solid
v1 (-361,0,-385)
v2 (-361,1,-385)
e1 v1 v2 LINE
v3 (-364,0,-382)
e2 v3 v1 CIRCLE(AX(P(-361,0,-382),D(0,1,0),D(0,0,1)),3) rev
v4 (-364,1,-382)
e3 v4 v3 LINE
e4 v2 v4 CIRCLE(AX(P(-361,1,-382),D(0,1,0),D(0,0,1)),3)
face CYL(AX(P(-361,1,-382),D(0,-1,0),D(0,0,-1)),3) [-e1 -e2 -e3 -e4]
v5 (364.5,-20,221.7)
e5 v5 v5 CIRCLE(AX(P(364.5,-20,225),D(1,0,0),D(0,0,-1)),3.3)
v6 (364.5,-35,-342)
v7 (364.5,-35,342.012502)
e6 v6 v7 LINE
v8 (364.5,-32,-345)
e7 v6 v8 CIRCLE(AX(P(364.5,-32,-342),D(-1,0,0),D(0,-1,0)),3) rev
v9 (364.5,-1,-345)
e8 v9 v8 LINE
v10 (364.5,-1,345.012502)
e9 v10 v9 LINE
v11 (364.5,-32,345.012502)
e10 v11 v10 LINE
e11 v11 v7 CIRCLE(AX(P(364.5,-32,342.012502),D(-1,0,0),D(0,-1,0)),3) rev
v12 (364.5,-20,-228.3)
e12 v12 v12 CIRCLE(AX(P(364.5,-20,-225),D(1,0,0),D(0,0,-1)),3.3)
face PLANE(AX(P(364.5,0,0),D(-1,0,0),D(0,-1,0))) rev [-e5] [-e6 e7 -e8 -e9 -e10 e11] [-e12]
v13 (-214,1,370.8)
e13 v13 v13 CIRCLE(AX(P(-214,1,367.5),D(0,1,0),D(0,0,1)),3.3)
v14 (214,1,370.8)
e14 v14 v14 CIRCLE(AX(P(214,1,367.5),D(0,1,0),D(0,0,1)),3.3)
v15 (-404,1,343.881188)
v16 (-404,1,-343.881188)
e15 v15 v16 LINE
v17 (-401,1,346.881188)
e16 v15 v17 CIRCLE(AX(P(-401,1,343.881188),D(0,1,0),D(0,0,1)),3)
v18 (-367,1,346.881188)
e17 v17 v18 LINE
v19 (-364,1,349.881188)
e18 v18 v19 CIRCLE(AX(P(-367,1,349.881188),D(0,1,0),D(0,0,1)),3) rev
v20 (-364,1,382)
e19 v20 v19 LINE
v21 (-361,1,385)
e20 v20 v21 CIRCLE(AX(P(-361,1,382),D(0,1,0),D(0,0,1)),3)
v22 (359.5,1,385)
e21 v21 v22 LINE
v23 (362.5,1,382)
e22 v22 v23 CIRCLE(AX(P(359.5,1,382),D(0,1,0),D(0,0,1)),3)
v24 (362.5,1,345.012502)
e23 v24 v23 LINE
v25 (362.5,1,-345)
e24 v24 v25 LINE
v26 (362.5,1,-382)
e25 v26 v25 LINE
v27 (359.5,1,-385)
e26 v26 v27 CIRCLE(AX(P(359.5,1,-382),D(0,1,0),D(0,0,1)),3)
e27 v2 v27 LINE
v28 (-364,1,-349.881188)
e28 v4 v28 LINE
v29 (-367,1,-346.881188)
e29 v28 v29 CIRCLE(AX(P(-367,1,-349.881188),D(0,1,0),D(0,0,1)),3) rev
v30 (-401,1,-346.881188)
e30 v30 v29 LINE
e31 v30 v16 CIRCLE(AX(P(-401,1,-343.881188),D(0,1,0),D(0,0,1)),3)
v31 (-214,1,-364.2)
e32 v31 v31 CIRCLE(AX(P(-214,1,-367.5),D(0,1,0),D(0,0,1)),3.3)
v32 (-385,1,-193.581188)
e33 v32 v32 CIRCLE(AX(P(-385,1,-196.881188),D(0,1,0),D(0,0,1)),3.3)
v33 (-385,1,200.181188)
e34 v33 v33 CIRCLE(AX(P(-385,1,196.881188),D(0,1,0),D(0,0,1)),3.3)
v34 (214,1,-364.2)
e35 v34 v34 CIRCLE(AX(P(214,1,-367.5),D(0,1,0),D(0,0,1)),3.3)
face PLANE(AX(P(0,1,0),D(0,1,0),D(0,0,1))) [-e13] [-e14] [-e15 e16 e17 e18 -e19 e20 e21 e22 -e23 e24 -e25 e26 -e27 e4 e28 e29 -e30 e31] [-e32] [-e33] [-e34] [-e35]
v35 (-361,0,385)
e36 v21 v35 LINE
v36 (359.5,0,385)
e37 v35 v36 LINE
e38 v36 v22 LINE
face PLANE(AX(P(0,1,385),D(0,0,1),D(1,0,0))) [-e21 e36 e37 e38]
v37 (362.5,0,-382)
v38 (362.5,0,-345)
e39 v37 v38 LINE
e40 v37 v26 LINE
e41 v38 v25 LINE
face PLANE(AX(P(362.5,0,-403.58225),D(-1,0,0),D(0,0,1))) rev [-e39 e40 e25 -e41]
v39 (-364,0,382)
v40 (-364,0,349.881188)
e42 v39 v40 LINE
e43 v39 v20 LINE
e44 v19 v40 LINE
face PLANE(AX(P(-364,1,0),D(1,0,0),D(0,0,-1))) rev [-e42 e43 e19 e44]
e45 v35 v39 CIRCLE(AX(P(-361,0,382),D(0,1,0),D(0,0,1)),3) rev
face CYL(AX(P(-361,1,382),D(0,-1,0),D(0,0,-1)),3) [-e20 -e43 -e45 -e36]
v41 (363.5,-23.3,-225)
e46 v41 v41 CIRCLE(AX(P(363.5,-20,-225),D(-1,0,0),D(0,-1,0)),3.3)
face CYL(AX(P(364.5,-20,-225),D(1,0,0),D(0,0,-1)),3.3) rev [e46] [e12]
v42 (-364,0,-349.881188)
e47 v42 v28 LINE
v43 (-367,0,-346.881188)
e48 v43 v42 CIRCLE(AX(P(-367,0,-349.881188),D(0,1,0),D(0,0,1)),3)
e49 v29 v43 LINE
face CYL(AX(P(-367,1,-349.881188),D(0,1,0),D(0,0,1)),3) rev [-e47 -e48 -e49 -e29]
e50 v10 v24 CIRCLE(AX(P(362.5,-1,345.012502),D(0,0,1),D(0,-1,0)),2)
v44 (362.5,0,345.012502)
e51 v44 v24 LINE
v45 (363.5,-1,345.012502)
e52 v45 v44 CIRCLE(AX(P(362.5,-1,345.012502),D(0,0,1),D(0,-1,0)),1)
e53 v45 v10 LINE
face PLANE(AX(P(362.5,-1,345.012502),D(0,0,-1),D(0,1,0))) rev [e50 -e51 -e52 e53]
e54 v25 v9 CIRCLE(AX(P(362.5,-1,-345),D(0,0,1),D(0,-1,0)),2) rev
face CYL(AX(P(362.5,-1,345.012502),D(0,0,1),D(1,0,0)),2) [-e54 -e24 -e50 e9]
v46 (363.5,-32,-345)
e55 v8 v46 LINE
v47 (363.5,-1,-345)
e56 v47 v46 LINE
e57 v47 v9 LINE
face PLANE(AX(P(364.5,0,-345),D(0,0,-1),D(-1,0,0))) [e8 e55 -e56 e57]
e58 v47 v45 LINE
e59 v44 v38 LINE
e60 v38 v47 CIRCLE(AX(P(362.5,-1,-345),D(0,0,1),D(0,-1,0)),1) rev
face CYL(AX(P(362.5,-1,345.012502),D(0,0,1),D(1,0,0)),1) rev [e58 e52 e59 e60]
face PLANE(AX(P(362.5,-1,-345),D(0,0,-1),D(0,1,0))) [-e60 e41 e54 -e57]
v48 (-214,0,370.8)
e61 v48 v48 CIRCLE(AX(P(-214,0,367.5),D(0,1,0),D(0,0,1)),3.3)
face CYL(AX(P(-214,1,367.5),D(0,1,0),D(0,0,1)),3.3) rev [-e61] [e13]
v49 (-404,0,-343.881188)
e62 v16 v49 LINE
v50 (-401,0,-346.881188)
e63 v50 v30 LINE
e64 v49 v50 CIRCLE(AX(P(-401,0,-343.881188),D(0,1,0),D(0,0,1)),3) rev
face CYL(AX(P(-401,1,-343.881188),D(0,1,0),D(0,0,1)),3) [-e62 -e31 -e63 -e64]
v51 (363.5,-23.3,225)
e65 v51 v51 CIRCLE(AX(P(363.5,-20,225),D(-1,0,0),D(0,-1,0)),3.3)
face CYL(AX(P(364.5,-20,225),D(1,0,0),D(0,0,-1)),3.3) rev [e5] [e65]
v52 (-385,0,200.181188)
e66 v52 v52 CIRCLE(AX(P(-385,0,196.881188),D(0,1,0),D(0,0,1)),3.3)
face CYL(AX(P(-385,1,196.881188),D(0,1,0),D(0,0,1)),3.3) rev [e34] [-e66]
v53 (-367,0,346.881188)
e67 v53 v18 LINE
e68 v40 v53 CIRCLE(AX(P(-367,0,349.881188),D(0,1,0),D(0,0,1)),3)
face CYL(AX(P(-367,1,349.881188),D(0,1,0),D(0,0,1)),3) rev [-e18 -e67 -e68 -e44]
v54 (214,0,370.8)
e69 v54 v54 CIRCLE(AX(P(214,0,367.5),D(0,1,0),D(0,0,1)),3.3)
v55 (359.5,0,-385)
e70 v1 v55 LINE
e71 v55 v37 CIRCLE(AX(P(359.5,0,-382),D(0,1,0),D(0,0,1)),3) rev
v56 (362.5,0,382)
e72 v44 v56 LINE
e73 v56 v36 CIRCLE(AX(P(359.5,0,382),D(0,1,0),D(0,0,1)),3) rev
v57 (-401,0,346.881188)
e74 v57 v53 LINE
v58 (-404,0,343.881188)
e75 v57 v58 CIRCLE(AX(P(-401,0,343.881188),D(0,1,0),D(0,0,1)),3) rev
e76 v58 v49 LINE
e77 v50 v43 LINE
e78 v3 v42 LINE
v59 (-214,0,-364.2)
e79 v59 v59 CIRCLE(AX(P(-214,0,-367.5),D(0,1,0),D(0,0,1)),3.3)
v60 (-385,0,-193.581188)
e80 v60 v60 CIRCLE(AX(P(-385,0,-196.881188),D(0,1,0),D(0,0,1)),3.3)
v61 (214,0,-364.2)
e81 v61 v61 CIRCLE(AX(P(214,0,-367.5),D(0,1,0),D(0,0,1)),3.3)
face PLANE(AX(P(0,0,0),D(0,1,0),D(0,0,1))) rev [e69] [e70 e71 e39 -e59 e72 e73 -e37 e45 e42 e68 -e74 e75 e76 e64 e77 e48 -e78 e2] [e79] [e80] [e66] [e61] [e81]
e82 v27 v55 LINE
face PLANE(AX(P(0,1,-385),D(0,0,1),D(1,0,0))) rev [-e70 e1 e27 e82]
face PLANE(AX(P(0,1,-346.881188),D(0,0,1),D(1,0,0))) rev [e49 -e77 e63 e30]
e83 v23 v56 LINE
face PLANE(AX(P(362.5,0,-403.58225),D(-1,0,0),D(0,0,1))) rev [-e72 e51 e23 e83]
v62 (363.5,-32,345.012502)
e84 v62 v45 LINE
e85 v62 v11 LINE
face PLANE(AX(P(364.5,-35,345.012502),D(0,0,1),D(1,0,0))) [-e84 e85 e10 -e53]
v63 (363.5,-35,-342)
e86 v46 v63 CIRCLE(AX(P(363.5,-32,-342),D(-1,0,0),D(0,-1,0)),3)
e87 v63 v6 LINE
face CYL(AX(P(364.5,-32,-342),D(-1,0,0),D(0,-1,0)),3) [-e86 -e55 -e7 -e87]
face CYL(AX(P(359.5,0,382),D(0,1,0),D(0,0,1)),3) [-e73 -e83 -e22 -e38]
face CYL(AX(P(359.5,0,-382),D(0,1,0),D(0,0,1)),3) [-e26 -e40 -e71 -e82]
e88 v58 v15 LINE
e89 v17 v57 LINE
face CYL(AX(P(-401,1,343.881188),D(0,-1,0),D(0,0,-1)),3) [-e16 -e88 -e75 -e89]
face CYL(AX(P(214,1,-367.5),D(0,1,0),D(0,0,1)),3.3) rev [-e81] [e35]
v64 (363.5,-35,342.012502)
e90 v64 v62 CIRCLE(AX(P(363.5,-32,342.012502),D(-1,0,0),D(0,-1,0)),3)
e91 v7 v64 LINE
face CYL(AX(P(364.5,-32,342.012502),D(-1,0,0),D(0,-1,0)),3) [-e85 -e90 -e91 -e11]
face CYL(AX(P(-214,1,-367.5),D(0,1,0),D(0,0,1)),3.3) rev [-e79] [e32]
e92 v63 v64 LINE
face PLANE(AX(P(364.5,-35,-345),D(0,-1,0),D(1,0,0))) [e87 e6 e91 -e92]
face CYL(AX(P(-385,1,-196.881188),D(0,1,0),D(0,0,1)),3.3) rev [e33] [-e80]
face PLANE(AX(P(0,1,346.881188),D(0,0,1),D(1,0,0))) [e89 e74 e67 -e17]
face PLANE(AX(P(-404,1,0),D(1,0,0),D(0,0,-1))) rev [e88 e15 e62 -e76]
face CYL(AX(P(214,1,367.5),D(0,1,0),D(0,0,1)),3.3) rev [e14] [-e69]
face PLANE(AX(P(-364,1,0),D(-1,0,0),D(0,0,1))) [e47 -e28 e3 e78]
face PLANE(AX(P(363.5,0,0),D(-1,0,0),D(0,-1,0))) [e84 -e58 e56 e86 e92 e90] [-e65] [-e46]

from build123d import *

# Parameters (mm, degrees)
BOSS_EXTRUDE1_DEPTH  = 1
M6_CLEARANCE_HOLE1_D = 6.6
SKETCH8_W            = 41.5
SKETCH8_H            = 838.415827604
CUT_EXTRUDE1_DEPTH   = 10
EDGE_FLANGE1_DEPTH   = 690.012501954
FILLET1_R            = 3
M6_CLEARANCE_HOLE2_D = 6.6


# Sheet-metal steps are written as plain solids
with BuildPart() as part:
    # Sketch1 → Boss-Extrude1 (new body)
    with BuildSketch(Plane(origin=(0, 0, 0), x_dir=(1, 0, 0), z_dir=(0, 1, 0))):
        Polygon((-364, -346.881188119), (-364, -385), (364, -385), (364, -346.881188119), (404, -346.881188119), (404, 346.881188119), (364, 346.881188119), (364, 385), (-364, 385), (-364, 346.881188119), (-404, 346.881188119), (-404, -346.881188119), align=None)
    extrude(amount=BOSS_EXTRUDE1_DEPTH)

    # M6 Clearance Hole1 (through all)
    with Locations(Plane(origin=(0, 1, 0), x_dir=(1, 0, 0), z_dir=(0, 1, 0))):
        with Locations((-214, -367.5), (-385, -196.881188119), (-385, 196.881188119), (-214, 367.5), (214, 367.5), (214, -367.5), (385, -286.881188119), (385, -86.881188119)):
            Hole(M6_CLEARANCE_HOLE1_D / 2)

    # Sketch8 → Cut-Extrude1 (cut)
    with BuildSketch(Plane(origin=(0, 1, 0), x_dir=(1, 0, 0), z_dir=(0, 1, 0))):
        with Locations((383.25, -15.625663738)):
            Rectangle(SKETCH8_W, SKETCH8_H)
    extrude(amount=-CUT_EXTRUDE1_DEPTH, mode=Mode.SUBTRACT)

    # Edge-Flange1 section (across the edge) → Edge-Flange1 (add)
    with BuildSketch(Plane(origin=(363.5, 0, -345), x_dir=(-1, 0, 0), z_dir=(0, 0, 1))):
        with BuildLine():
            Line((-1, 1), (-1, 35))
            Line((-1, 35), (0, 35))
            Line((0, 35), (0, 1))
            ThreePointArc((0, 1), (0.292893219, 0.292893219), (1, 0))
            Line((1, 0), (1, -1))
            ThreePointArc((1, -1), (-0.414213562, -0.414213562), (-1, 1))
        make_face()
    extrude(amount=EDGE_FLANGE1_DEPTH)

    # Fillet1
    fillet1_edges = [part.edges().sort_by_distance(p)[0] for p in [
        (364, -35, -345),
        (364, -35, 345.012501954),
        (-364, 0.5, 385),
        (-364, 0.5, 346.881188119),
        (-404, 0.5, 346.881188119),
        (-404, 0.5, -346.881188119),
        (-364, 0.5, -346.881188119),
        (-364, 0.5, -385),
        (362.5, 0.5, -385),
        (362.5, 0.5, 385),
    ]]
    fillet(fillet1_edges, radius=FILLET1_R)

    # M6 Clearance Hole2 (through all)
    with Locations(Plane(origin=(364.5, 0, 0), x_dir=(0, 0, -1), z_dir=(1, 0, 0))):
        with Locations((-225, -20), (225, -20)):
            Hole(M6_CLEARANCE_HOLE2_D / 2)


solid = part.part
